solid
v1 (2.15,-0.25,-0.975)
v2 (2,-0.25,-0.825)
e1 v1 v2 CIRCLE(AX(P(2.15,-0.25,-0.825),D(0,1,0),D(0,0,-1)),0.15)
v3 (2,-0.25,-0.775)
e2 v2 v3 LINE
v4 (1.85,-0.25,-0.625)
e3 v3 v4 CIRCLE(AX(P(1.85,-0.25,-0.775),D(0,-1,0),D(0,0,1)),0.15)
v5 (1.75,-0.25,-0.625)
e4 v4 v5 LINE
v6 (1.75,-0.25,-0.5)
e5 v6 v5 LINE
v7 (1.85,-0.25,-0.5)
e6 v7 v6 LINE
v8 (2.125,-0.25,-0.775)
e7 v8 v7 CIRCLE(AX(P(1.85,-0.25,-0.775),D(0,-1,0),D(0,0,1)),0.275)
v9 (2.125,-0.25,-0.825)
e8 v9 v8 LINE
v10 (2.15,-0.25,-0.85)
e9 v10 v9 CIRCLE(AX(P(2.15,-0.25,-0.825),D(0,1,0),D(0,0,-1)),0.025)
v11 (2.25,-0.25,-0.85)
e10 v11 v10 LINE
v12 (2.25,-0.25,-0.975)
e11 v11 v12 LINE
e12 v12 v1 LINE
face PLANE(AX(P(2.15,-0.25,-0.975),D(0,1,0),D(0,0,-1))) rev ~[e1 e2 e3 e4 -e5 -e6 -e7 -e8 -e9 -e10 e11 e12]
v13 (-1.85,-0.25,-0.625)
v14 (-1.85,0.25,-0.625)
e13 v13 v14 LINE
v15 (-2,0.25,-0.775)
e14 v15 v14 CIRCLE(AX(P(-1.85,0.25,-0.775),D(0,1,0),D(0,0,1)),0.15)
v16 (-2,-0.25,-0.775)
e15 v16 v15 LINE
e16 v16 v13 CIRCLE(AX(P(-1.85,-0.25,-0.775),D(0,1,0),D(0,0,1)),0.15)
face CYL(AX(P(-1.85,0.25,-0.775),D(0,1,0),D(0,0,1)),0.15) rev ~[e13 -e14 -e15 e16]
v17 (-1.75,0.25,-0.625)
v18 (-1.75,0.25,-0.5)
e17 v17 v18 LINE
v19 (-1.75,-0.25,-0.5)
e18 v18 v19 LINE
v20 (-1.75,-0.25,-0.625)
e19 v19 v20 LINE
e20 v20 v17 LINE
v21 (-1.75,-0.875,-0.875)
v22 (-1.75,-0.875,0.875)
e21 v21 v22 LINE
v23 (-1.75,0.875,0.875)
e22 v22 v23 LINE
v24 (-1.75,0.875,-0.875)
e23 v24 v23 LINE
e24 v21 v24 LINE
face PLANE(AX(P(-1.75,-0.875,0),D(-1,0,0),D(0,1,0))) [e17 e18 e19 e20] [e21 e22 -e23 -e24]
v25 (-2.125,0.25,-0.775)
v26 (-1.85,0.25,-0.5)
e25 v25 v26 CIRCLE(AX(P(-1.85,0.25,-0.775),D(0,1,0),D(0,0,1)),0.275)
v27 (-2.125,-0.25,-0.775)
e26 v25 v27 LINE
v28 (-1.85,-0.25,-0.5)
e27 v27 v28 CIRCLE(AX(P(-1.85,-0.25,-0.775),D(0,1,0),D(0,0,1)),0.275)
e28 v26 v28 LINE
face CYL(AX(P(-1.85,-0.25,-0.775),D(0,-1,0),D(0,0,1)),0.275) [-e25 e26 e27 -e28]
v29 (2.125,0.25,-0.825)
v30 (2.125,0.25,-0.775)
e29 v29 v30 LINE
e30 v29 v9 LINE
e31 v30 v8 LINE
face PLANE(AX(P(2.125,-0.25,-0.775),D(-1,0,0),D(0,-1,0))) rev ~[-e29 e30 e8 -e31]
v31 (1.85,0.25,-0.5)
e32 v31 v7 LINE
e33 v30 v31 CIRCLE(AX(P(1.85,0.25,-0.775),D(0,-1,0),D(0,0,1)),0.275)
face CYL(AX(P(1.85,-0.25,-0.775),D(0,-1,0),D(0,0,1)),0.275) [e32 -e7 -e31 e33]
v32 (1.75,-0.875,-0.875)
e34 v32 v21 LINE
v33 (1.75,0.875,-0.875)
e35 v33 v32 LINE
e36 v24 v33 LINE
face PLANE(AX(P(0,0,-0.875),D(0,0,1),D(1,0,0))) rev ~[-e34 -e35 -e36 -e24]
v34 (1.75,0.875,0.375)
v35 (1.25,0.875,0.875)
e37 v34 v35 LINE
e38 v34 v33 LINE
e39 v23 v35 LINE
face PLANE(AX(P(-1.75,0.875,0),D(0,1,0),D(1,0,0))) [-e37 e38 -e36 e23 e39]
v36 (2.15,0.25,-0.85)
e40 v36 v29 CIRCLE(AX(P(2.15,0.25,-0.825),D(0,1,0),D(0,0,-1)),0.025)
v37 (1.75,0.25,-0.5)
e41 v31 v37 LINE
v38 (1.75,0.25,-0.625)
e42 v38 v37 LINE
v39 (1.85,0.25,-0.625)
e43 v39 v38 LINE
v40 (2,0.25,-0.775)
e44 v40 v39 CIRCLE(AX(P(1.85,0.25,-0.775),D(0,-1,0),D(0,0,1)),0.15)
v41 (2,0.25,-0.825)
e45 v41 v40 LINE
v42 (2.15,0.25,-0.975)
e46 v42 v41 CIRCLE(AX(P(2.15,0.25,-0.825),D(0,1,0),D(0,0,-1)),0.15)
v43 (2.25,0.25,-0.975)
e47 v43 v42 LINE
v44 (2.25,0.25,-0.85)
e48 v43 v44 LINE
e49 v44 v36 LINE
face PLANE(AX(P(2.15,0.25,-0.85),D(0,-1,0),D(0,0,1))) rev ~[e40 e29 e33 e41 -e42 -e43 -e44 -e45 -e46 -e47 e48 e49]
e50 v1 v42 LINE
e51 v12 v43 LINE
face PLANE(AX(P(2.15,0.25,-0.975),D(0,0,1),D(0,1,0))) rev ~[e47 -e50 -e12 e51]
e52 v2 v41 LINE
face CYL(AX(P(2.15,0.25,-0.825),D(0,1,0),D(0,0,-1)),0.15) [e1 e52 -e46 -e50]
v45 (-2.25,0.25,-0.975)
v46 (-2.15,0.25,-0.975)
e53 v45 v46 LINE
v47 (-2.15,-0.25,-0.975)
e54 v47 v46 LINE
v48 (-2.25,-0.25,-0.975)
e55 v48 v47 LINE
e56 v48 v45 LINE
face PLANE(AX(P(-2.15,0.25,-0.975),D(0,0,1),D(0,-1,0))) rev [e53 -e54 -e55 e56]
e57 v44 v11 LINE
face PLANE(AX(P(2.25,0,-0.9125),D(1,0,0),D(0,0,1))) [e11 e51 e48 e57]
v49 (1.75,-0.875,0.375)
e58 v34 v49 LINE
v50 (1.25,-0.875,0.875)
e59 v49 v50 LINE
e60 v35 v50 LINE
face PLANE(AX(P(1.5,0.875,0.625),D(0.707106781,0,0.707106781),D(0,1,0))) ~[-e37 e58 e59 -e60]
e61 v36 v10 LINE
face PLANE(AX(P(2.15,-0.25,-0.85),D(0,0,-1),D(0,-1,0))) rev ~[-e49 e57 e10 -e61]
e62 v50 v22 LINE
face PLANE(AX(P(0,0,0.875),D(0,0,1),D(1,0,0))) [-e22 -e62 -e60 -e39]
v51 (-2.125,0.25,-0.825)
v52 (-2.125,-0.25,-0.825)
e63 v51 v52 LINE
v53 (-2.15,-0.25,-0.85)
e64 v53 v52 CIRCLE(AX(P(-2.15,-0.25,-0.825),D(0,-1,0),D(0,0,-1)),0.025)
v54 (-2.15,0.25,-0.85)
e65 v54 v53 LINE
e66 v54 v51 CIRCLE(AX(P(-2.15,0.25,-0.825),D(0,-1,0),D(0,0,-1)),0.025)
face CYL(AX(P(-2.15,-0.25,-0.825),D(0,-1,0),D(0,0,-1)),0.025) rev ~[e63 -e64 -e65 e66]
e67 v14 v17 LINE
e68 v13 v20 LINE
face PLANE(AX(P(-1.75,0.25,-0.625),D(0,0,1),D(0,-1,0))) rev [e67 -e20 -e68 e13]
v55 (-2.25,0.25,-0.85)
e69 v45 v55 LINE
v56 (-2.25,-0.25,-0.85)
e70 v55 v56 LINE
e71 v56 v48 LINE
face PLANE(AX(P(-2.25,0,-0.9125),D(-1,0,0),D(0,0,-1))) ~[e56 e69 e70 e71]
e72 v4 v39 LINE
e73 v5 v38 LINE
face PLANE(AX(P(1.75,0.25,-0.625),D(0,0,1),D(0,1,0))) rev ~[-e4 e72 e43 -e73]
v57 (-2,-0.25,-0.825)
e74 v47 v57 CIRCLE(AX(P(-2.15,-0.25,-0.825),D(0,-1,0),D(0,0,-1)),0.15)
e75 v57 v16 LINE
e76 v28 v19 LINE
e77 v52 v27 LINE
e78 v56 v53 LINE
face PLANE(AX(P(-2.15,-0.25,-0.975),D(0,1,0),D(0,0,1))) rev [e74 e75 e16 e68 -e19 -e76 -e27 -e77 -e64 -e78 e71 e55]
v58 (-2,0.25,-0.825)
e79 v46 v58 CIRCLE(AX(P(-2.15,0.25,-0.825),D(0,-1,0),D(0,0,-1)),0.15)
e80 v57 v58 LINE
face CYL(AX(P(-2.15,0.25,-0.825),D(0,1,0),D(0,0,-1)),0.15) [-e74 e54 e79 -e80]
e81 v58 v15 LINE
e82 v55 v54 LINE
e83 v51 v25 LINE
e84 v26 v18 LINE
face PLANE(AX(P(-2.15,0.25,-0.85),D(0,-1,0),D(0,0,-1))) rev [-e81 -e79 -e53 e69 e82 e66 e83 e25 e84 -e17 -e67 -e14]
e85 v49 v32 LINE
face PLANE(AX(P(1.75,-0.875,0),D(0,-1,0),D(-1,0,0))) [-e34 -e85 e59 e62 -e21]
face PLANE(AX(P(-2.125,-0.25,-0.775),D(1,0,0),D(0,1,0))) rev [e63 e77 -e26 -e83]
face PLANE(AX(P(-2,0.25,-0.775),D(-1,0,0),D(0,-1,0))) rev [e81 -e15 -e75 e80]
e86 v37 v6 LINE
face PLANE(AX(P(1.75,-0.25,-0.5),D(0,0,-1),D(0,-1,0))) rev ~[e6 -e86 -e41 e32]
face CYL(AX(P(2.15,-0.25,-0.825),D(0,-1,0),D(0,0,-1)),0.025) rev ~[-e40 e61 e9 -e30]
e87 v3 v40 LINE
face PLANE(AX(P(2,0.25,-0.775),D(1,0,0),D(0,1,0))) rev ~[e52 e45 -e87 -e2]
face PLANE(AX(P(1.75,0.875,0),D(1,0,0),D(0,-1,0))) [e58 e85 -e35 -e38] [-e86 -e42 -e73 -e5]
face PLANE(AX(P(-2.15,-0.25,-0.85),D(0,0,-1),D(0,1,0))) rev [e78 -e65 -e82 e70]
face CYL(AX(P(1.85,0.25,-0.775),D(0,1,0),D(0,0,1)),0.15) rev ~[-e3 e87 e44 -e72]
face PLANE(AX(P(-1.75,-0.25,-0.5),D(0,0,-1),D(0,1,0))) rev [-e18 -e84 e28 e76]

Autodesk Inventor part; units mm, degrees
ref_plane "YZ Plane" through (0, 0, 0) normal (1, 0, 0) x (0, 1, 0)
ref_plane "XZ Plane" through (0, 0, 0) normal (0, 1, 0) x (-1, 0, 0)
sketch "Sketch1" plane through (0, 0, 0) normal (0, 0, 1) x (1, 0, 0)
  line L0 (-1.75, 0.875) -> (1.75, 0.875)
  line L1 (1.75, 0.875) -> (1.75, -0.875)
  line L2 (1.75, -0.875) -> (-1.75, -0.875)
  line L3 (-1.75, -0.875) -> (-1.75, 0.875)
  line L4 (0, 0) -> (0, 0.875) construction
  line L5 (0, 0) -> (-1.75, 0) construction
  line L6 (0, 0) -> (1.75, 0) construction
  line L7 (0, 0) -> (0, -0.875) construction
  dimension "d0" = 1.75
  dimension "d1" = 3.5
extrude "Extrusion1" add sketch "Sketch1" along normal mid plane 1.75
chamfer "Chamfer1" distance 0.5 angle 45 1 edges at (1.75, 0, 0.875)
sketch "Sketch2" plane through (1.75, -0.875, -0.875) normal (1, 0, 0) x (0, 0, -1)
  line L0 (-1.25, 0) -> (0, 0) projected
  line L1 (0, 0) -> (0, 1.75) projected
  line L2 (-1.25, 1.75) -> (0, 1.75) projected
  line L3 (-0.375, 1.125) -> (-0.25, 1.125)
  line L4 (-0.25, 1.125) -> (-0.25, 0.625)
  line L5 (-0.25, 0.625) -> (-0.375, 0.625)
  line L6 (-0.375, 0.625) -> (-0.375, 1.125)
  line L7 (-0.3125, 1.125) -> (-0.3125, 1.75) construction
  line L8 (-0.3125, 0.625) -> (-0.3125, 0) construction
  dimension "d6" = 0.25
  dimension "d7" = 0.5
  dimension "d8" = 0.125
ref_plane "Work Plane2" through (1.75, -0.25, -0.625) normal (0, 1, 0) x (0, 0, 1)
sketch "Sketch4" plane through (1.75, -0.25, -0.625) normal (0, 1, 0) x (0, 0, 1)
  line L0 (0, 0) -> (0.125, 0) projected
  line L1 (0, 0) -> (0, 0.1)
  line L2 (-0.15, 0.25) -> (-0.2, 0.25)
  line L3 (-0.35, 0.4) -> (-0.35, 0.5)
  arc A0 (0, 0.1) -> (-0.15, 0.25) centre (-0.15, 0.1) ccw
  arc A1 (-0.35, 0.4) -> (-0.2, 0.25) centre (-0.2, 0.4) ccw
  point P0 (0, 0.25)
  point P1 (-0.35, 0.25)
  dimension "d11" = 0.25
  dimension "d12" = 0.25
  dimension "d13" = 0.35
  dimension "d14" = 0.15
sweep "Sweep1" add profiles "Sketch2" path "Sketch4"
mirror "Mirror1" about plane through (0, 0, 0) normal (1, 0, 0) of "Sweep1"
properties part number "Cap1 SMT" material "Delrin, White"
